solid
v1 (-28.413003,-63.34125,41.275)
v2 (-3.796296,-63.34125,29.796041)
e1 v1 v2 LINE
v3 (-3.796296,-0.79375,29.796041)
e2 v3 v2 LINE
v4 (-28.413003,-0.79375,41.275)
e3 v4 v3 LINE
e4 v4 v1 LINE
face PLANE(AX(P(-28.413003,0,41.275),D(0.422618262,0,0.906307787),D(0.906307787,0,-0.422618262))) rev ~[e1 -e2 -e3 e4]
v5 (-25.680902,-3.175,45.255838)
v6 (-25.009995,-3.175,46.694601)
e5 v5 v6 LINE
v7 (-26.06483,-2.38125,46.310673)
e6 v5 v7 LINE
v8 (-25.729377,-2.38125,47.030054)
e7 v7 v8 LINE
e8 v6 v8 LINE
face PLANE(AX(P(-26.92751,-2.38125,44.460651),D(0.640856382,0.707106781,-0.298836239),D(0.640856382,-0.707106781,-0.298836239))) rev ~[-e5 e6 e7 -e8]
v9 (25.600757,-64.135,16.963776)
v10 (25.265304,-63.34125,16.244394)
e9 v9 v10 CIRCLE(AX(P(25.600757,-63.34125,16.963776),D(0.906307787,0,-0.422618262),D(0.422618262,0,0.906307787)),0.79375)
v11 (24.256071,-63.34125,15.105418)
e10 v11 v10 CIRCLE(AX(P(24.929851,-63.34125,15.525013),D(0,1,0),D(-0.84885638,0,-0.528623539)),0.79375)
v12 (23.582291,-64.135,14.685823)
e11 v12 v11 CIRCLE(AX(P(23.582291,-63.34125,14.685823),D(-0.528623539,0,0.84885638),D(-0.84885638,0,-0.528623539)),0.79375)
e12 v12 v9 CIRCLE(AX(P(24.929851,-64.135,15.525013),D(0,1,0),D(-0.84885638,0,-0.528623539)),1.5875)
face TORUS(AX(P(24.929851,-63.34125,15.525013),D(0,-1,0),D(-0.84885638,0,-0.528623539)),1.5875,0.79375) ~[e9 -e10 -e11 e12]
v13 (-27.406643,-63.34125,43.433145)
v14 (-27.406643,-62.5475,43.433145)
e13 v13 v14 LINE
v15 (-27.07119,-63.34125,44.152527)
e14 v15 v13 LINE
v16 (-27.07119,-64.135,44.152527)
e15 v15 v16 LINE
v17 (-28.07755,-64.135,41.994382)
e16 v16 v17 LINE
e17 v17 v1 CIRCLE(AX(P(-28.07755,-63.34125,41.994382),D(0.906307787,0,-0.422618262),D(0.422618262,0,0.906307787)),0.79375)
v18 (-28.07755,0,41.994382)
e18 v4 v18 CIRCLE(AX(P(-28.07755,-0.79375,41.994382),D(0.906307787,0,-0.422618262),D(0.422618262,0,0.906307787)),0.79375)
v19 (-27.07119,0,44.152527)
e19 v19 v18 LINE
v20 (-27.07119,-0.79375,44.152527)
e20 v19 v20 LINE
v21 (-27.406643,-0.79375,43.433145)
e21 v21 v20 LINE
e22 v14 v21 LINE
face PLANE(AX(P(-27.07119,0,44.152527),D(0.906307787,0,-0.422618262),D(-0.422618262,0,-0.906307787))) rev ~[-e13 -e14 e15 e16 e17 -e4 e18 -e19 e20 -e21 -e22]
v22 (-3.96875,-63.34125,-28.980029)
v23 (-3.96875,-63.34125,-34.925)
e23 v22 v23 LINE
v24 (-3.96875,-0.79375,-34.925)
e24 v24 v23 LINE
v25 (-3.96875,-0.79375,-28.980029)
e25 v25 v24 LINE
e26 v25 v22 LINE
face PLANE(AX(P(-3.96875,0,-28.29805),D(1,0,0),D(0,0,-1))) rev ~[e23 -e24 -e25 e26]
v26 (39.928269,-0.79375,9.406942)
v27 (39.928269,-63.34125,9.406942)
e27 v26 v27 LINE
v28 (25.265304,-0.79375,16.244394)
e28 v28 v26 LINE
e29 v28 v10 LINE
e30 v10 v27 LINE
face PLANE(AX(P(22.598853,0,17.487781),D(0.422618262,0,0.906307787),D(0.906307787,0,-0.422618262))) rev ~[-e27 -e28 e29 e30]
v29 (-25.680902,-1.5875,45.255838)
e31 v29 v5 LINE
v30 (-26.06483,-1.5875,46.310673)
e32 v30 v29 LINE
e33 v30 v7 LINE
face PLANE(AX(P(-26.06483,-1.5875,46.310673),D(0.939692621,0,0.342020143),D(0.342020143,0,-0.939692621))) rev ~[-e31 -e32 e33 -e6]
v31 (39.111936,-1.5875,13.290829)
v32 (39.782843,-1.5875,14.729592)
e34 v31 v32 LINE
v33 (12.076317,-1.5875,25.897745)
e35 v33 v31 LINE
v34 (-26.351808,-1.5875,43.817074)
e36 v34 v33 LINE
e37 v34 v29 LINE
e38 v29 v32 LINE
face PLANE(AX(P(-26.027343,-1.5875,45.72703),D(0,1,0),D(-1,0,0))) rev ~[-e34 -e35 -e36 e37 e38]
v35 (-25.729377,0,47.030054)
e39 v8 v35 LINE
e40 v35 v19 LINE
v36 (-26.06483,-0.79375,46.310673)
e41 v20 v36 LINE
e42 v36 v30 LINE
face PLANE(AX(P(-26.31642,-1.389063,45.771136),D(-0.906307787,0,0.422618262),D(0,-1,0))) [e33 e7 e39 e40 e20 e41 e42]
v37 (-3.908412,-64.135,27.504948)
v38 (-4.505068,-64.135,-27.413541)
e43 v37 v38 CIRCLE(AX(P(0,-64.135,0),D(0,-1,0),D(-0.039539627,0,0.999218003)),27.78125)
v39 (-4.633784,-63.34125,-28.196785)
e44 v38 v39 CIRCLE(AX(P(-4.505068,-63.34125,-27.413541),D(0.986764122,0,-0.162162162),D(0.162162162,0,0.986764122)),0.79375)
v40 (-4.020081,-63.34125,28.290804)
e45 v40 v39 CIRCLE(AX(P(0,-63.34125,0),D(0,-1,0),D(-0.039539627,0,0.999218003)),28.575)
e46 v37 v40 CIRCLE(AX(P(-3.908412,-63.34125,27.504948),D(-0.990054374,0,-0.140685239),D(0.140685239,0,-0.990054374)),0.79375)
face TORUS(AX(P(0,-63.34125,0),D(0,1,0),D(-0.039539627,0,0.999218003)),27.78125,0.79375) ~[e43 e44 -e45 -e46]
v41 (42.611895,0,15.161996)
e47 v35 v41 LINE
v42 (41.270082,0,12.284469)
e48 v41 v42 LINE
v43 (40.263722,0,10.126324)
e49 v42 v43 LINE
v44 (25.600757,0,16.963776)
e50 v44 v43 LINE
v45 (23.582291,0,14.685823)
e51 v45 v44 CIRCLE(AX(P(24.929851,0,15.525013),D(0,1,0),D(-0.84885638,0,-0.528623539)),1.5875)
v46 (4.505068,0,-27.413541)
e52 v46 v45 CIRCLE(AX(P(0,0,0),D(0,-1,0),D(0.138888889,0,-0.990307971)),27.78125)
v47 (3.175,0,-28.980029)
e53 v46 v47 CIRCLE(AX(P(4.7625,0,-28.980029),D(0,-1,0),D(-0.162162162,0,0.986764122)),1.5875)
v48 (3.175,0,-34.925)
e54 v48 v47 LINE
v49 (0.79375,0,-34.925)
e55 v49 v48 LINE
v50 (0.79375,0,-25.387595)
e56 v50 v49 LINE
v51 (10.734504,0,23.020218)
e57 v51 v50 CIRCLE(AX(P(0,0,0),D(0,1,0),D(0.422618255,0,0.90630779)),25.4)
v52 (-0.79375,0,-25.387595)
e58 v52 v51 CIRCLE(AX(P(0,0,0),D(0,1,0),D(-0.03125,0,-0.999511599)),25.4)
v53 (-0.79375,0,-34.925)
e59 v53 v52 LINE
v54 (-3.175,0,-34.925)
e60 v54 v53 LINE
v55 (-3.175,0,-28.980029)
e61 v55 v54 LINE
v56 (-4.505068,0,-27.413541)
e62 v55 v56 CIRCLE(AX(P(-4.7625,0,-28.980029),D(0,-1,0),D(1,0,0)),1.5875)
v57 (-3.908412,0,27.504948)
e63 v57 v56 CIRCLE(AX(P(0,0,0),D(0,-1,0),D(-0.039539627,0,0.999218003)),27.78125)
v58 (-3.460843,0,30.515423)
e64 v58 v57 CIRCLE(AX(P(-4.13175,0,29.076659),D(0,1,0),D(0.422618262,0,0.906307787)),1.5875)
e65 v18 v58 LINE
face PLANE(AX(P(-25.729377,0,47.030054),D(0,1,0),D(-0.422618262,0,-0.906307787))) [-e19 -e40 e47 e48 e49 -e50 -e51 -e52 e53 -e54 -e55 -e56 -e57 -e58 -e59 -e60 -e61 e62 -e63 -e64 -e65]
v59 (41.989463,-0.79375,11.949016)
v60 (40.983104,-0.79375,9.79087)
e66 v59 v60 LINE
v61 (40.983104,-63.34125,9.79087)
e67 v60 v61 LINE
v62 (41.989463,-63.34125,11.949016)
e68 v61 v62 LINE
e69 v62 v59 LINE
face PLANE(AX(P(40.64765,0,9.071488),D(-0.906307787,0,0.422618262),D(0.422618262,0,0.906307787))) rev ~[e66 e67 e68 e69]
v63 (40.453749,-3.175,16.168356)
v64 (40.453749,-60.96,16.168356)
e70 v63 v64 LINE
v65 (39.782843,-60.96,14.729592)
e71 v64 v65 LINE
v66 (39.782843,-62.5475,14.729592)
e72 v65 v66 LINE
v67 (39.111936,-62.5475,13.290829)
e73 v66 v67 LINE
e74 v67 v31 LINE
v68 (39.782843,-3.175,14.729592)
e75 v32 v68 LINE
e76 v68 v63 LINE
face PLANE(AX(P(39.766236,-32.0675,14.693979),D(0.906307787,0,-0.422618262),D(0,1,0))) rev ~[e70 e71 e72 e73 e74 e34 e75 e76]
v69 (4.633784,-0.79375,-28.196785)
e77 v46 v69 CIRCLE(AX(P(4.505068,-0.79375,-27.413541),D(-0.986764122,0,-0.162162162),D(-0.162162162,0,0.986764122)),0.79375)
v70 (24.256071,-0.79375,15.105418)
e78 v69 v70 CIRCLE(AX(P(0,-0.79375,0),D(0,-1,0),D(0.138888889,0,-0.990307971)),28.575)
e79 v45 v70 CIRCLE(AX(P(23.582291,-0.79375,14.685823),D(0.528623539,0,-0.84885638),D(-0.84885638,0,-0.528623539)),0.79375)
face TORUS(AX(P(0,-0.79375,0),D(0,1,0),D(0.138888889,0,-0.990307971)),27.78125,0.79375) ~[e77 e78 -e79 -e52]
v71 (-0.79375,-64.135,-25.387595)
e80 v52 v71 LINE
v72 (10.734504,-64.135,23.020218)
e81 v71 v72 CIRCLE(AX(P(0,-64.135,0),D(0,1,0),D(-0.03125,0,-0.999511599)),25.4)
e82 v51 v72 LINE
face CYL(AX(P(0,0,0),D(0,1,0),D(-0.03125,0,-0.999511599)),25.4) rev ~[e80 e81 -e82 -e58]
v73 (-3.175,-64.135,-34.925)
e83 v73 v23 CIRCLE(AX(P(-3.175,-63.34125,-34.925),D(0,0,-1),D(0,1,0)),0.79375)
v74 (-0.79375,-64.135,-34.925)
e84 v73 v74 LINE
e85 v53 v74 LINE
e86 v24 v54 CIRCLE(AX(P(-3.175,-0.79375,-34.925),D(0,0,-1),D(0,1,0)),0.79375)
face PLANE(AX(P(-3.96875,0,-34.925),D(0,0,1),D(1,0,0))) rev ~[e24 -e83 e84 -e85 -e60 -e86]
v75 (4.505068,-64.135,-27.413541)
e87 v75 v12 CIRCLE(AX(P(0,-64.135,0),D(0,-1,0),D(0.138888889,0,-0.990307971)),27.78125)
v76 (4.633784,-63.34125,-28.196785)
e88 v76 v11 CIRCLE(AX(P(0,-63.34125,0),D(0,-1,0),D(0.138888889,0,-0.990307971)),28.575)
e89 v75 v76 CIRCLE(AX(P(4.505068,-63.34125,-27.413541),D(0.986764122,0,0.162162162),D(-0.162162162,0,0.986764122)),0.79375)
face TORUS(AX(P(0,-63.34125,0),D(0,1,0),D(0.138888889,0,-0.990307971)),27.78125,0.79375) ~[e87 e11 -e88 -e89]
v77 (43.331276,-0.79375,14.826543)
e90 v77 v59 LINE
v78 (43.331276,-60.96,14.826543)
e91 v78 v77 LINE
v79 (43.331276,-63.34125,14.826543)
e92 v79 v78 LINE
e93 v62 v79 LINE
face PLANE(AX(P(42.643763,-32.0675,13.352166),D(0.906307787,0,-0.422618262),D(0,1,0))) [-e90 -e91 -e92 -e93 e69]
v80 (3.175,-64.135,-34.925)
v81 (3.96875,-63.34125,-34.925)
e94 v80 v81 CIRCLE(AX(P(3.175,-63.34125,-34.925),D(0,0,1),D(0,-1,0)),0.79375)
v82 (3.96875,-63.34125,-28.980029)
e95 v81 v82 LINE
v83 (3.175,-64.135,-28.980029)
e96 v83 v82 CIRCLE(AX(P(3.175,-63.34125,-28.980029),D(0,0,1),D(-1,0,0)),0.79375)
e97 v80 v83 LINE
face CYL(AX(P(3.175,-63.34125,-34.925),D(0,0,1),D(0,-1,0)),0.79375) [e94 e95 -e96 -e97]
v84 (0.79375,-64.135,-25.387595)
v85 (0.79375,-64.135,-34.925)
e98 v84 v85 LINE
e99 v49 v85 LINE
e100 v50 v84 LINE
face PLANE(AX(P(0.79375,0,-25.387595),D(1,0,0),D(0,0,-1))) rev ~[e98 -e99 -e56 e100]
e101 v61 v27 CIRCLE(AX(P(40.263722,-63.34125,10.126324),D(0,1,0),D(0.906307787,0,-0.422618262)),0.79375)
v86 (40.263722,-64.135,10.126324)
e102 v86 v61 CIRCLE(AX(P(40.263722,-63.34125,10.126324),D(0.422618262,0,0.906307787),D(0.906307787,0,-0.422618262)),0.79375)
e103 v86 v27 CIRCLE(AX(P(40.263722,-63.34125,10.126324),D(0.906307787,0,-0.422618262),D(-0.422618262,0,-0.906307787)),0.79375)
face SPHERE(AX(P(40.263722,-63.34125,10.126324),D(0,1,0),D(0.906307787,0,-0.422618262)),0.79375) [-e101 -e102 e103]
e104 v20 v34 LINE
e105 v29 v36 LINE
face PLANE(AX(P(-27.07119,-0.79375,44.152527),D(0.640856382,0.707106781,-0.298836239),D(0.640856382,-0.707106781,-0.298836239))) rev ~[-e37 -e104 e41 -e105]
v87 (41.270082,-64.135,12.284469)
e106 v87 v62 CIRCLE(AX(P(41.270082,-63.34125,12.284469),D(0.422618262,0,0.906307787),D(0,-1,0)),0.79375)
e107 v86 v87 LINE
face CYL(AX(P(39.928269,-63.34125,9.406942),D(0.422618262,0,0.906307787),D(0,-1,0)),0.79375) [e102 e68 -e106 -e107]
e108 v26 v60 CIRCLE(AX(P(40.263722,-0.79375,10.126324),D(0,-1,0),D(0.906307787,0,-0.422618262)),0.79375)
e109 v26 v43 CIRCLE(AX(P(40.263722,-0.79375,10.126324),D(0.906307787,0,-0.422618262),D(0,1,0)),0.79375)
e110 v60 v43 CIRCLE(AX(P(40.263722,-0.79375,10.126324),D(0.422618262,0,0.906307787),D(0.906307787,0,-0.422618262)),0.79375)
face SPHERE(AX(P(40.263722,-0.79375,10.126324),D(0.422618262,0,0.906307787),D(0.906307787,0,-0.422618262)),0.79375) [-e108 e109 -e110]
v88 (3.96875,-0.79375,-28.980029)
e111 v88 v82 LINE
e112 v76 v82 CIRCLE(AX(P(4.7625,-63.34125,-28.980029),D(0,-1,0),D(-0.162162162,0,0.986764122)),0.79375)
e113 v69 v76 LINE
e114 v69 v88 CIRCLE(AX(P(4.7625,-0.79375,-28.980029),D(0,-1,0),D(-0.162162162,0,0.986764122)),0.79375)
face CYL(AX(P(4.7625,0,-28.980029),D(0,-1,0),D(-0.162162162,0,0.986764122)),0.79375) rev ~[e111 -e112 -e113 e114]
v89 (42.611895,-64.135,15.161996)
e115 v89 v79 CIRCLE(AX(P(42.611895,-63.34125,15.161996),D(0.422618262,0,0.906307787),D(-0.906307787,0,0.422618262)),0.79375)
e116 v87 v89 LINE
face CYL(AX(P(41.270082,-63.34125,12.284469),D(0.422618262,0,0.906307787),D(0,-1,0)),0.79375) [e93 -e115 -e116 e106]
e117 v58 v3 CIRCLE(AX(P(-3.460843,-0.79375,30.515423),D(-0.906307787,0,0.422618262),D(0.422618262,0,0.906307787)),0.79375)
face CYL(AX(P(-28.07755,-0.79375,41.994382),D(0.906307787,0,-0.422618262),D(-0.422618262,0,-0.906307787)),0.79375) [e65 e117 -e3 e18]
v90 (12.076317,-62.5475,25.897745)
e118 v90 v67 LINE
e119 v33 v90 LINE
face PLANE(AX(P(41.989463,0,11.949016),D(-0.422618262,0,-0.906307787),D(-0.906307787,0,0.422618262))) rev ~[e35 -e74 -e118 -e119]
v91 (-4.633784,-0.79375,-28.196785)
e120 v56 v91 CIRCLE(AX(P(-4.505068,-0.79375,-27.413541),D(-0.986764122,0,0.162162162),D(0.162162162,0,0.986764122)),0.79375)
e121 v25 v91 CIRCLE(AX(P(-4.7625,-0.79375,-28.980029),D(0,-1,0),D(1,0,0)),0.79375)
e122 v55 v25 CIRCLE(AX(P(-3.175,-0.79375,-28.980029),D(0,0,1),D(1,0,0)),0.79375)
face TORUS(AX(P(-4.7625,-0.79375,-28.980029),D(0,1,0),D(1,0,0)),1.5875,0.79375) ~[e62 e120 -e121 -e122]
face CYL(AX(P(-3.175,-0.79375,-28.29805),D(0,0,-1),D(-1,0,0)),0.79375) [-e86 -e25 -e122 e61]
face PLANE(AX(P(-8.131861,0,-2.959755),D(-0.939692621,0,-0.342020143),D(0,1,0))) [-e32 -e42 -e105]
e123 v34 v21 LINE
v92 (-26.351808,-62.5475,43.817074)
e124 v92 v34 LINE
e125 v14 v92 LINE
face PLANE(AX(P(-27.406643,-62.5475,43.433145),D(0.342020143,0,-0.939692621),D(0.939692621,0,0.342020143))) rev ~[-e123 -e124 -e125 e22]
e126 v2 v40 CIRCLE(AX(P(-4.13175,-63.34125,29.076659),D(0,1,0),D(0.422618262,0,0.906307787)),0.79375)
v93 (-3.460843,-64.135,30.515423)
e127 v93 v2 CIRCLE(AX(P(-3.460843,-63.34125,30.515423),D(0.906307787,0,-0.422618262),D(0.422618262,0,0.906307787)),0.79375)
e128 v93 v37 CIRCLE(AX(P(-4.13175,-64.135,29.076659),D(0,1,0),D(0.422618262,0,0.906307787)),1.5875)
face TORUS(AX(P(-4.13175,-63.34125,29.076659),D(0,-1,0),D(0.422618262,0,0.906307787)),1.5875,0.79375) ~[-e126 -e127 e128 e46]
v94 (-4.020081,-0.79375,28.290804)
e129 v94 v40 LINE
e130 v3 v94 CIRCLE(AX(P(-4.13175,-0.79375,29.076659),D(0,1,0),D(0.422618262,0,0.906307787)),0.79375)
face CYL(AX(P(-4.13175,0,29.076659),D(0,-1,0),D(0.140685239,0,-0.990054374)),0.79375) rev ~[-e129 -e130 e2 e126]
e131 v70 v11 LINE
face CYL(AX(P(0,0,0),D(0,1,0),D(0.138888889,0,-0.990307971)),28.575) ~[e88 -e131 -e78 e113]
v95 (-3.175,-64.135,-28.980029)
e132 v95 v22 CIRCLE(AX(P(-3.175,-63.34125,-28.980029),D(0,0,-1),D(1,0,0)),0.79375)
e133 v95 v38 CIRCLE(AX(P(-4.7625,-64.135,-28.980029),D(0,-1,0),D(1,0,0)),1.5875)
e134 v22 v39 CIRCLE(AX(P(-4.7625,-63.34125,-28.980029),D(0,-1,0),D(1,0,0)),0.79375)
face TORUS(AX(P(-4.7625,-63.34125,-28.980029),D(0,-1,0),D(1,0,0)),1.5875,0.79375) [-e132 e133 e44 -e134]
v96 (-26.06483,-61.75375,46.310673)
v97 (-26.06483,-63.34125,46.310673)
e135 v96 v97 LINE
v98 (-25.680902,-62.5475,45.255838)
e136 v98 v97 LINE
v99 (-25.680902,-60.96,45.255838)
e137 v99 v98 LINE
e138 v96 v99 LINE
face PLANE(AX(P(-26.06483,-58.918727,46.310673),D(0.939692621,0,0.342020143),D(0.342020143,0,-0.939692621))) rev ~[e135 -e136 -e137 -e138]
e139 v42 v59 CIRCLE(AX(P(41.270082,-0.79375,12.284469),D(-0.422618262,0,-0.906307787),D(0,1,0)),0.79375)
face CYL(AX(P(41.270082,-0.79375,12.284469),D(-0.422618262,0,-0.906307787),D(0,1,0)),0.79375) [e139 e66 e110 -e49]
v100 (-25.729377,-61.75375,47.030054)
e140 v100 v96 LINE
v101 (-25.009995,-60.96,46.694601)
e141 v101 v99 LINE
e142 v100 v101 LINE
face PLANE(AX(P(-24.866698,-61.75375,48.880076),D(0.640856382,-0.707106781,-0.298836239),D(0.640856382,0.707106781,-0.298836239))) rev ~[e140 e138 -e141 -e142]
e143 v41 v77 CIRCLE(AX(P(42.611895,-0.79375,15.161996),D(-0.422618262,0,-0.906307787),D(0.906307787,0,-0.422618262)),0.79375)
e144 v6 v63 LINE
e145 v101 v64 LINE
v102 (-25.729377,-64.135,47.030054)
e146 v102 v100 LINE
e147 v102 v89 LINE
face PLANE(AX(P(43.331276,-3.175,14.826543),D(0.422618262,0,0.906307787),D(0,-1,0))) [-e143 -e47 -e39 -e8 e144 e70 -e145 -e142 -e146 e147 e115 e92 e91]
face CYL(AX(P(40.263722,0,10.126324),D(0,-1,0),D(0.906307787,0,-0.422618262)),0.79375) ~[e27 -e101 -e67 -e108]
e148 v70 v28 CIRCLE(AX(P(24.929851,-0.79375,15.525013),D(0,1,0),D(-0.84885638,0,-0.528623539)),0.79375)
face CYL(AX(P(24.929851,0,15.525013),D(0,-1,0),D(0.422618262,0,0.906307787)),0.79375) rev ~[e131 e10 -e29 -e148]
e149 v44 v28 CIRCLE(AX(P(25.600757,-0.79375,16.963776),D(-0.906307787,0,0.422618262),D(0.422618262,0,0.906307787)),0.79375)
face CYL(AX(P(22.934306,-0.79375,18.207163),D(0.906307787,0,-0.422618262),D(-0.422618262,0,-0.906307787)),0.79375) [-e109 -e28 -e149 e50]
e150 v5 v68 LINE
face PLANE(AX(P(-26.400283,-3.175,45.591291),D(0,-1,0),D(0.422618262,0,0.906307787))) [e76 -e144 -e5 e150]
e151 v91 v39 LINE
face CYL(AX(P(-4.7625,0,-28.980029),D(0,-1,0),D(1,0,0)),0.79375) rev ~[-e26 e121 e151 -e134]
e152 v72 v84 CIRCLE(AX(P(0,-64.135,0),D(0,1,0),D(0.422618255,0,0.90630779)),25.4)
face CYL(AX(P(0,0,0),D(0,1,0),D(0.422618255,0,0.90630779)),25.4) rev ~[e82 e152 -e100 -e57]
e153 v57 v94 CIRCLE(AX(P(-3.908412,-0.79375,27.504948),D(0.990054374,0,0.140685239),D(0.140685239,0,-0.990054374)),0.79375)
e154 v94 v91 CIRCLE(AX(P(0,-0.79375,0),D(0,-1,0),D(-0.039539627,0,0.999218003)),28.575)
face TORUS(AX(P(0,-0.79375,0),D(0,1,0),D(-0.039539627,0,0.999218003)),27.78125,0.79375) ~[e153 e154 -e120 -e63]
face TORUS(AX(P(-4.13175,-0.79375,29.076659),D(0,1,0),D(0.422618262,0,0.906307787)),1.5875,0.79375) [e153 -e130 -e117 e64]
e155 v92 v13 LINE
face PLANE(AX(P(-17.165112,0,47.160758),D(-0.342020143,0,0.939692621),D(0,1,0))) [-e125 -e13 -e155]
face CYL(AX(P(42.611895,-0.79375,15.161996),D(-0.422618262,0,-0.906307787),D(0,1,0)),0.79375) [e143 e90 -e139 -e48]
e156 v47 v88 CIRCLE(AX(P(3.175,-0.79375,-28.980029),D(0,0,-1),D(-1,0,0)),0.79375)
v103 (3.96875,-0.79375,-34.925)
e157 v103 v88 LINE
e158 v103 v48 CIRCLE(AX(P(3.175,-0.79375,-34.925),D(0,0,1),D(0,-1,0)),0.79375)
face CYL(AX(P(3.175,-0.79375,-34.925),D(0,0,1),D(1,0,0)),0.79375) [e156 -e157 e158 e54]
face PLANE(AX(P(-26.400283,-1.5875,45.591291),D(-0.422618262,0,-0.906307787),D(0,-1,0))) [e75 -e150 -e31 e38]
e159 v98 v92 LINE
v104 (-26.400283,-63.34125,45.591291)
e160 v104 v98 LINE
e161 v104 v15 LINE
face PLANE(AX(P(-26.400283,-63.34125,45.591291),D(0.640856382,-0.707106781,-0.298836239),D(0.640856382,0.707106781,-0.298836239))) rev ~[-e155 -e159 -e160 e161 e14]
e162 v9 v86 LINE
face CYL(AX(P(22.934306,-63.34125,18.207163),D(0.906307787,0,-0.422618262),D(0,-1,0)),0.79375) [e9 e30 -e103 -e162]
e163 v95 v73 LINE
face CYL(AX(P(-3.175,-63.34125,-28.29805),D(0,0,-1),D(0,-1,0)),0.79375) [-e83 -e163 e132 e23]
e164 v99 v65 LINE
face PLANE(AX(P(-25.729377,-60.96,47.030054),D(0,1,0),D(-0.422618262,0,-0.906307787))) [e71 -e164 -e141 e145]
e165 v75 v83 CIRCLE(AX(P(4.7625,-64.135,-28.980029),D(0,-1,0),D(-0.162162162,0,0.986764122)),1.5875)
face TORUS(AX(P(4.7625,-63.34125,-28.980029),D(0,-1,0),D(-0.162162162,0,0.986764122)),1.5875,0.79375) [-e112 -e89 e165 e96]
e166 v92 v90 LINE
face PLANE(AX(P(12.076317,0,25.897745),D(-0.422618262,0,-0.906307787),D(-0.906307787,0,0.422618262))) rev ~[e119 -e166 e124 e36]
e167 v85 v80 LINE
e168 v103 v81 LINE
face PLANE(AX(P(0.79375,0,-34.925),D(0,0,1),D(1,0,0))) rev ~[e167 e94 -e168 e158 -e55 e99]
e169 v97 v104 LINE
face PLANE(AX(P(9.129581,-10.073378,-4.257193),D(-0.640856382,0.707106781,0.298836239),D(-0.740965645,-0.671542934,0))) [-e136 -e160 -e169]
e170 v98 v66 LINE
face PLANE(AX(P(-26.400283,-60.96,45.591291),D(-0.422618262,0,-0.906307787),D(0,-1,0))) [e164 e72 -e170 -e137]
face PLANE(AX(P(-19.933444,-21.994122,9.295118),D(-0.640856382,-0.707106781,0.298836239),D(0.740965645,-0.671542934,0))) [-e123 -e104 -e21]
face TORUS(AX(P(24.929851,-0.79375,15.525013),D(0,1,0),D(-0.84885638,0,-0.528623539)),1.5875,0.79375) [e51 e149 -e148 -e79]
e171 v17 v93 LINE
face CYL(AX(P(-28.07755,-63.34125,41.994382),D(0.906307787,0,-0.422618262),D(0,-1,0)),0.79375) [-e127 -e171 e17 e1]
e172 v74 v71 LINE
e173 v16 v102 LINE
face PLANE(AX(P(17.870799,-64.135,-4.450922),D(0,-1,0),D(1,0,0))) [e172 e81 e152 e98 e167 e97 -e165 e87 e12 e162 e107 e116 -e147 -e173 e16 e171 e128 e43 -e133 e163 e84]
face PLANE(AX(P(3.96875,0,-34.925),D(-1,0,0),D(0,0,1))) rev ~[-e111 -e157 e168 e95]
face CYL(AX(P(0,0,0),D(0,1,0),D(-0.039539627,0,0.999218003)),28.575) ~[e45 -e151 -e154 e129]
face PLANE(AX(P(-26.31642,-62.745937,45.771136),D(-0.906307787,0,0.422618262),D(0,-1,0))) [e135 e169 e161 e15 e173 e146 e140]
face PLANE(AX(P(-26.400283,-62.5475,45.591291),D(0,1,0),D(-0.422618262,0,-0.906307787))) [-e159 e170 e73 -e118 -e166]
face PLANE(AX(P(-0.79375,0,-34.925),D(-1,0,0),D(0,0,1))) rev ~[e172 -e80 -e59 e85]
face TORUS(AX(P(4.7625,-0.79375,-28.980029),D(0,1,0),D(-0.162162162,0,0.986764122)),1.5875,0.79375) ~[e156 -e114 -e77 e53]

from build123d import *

# Parameters (mm, degrees)
F1_DEPTH     = 64.135
F3_DEPTH     = 76.2
F5_DEPTH     = 3.175
F6_R         = 0.79375
F7_T1_DEPTH  = 3.6287733717
F7_T6_DEPTH  = 4.4225233717
F7_T8_DEPTH  = 4.8762967434
F7_T13_DEPTH = 63.7950233717
F7_T18_DEPTH = 4.4225233717
F7_T23_DEPTH = 6.4637967434
F7_T25_DEPTH = 4.8762967434


# Not quite as in the source:
# - a fillet or chamfer that OpenCascade refuses, or shapes differently, is made with other operations: its cross-section is extruded or revolved along the edge and cut away or added


with BuildPart() as f1:
    # F0 (on Front) → F1 (new body)
    with BuildSketch(Plane.XZ):
        with BuildLine():
            ThreePointArc((10.7345036748, 23.0202178716), (24.8808005482, -5.1093800095), (0.79375, -25.3875946269))
            Line((0.79375, -25.3875946269), (0.79375, -28.563973567))
            ThreePointArc((0.79375, -28.563973567), (2.3849591955, -28.4752979727), (3.96875, -28.2980502586))
            ThreePointArc((3.96875, -28.2980502586), (26.4678099831, -10.7696638619), (22.5988525327, 17.4877811401))
            Line((22.5988525327, 17.4877811401), (10.7345036748, 23.0202178716))
        make_face()
        with BuildLine():
            Line((-1.1298448363, 28.5526544413), (10.7345036748, 23.0202178716))
            Line((10.7345036748, 23.0202178716), (22.5988525327, 17.4877811401))
            ThreePointArc((22.5988525327, 17.4877811401), (17.8402275241, 22.3216689987), (12.0763169886, 25.8977449403))
            ThreePointArc((12.0763169886, 25.8977449403), (5.6319134635, 28.0144993841), (-1.1298448363, 28.5526544413))
        make_face()
        with BuildLine():
            ThreePointArc((-0.79375, -25.3875946269), (-24.708980627, 5.8844096028), (10.7345036748, 23.0202178716))
            Line((10.7345036748, 23.0202178716), (-1.1298448363, 28.5526544413))
            ThreePointArc((-1.1298448363, 28.5526544413), (-28.5394389143, 1.4251496253), (-3.96875, -28.2980502586))
            ThreePointArc((-3.96875, -28.2980502586), (-2.3849591955, -28.4752979727), (-0.79375, -28.563973567))
            Line((-0.79375, -28.563973567), (-0.79375, -25.3875946269))
        make_face()
        with BuildLine():
            ThreePointArc((3.96875, -28.2980502586), (2.3849591955, -28.4752979727), (0.79375, -28.563973567))
            Line((0.79375, -28.563973567), (0.79375, -34.925))
            Line((0.79375, -34.925), (3.96875, -34.925))
            Line((3.96875, -34.925), (3.96875, -28.2980502586))
        make_face()
        with BuildLine():
            ThreePointArc((12.0763169886, 25.8977449403), (17.8402275241, 22.3216689987), (22.5988525327, 17.4877811401))
            Line((22.5988525327, 17.4877811401), (40.6476504402, 9.0714884554))
            Line((40.6476504402, 9.0714884554), (41.9894634213, 11.9490156792))
            Line((41.9894634213, 11.9490156792), (12.0763169886, 25.8977449403))
        make_face()
        with BuildLine():
            Line((-28.413002932, 41.275), (-1.1298448363, 28.5526544413))
            ThreePointArc((-1.1298448363, 28.5526544413), (5.6319134635, 28.0144993841), (12.0763169886, 25.8977449403))
            Line((12.0763169886, 25.8977449403), (-27.0711899509, 44.1525272238))
            Line((-27.0711899509, 44.1525272238), (-28.413002932, 41.275))
        make_face()
        with BuildLine():
            Line((-0.79375, -34.925), (-0.79375, -28.563973567))
            ThreePointArc((-0.79375, -28.563973567), (-2.3849591955, -28.4752979727), (-3.96875, -28.2980502586))
            Line((-3.96875, -28.2980502586), (-3.96875, -34.925))
            Line((-3.96875, -34.925), (-0.79375, -34.925))
        make_face()
    extrude(amount=F1_DEPTH)

    # F2 (on face) → F3 (join, through all)
    with BuildSketch(Plane(origin=(-39.1475067802, 0, 18.2547822093), x_dir=(0, -1, 0), z_dir=(-0.906307787, 0, 0.4226182617))):
        Polygon((0, 31.75), (0, 28.575), (1.5875, 28.575), (1.5875, 30.1625), (3.175, 30.1625), (3.175, 31.75), align=None)
        Polygon((62.5475, 30.1625), (62.5475, 28.575), (64.135, 28.575), (64.135, 31.75), (60.96, 31.75), (60.96, 30.1625), align=None)
    extrude(amount=-F3_DEPTH)

    # F4 (on face) → F5 (join)
    with BuildSketch(Plane(origin=(29.913146592, 0, -13.9487293354), x_dir=(0, 1, 0), z_dir=(0.906307787, 0, -0.4226182617))):
        Polygon((-3.175, 31.75), (-60.96, 31.75), (-60.96, 30.1625), (-62.5475, 30.1625), (-62.5475, 28.575), (-1.5875, 28.575), (-1.5875, 30.1625), (-3.175, 30.1625), align=None)
    extrude(amount=-F5_DEPTH)

    # F6
    f6_edges = [f1.edges().sort_by_distance(p)[0] for p in [
        (-28.539439, 0, 1.42515),
        (-28.539439, -64.135, 1.42515),
        (-1.129845, -32.0675, 28.552654),
        (-3.96875, -32.0675, -28.29805),
        (22.598853, -32.0675, 17.487781),
        (3.96875, -32.0675, -28.29805),
        (26.46781, 0, -10.769664),
        (26.46781, -64.135, -10.769664),
        (41.989463, 0, 11.949016),
        (40.64765, -32.0675, 9.071488),
        (41.989463, -64.135, 11.949016),
        (3.96875, -64.135, -31.611525),
        (31.623251, -64.135, 13.279635),
        (-14.771424, -64.135, 34.913827),
        (-3.96875, -64.135, -31.611525),
        (-3.96875, 0, -31.611525),
        (-14.771424, 0, 34.913827),
        (31.623251, 0, 13.279635),
        (3.96875, 0, -31.611525),
    ]]
    fillet(f6_edges, radius=F6_R)

    # F7: chamfer of 0.79375 on 7 edges, made by hand

    # F7_s2 → F7_t1 (cut)
    with BuildSketch(Plane.XZ.offset(1.5875)):
        Polygon((-26.0648302152, 46.3106726417), (-25.6809016545, 45.2558375905), (-26.4002834604, 45.5912908358), align=None)
    extrude(amount=F7_T1_DEPTH, mode=Mode.SUBTRACT)


with BuildPart() as f7_tool4:
    # F7_s5 → F7_t6 (new body)
    with BuildSketch(Plane(origin=(12.0763168292, 0, 25.8977450146), x_dir=(0, 1, 0), z_dir=(0.4226182617, 0, 0.906307787))):
        Polygon((-0.79375, 43.1944945637), (-1.5875, 42.4007445637), (-1.5875, 43.1944945637), align=None)
    extrude(amount=F7_T6_DEPTH)

    split(bisect_by=Plane(origin=(-8.131860996, 0, -2.9597553517), x_dir=(0, 1, 0), z_dir=(-0.9396926208, 0, -0.3420201433)), keep=Keep.TOP)


with BuildPart() as f1_1:
    add(f1.part)

    # F7_t3: cut F7_tool4
    add(f7_tool4.part, mode=Mode.SUBTRACT)

    # F7_s9 → F7_t8 (cut)
    with BuildSketch(Plane(origin=(12.2199971609, 0, 26.2058684802), x_dir=(0, 1, 0), z_dir=(0.4226182617, 0, 0.906307787))):
        Polygon((-2.38125, 43.1944945637), (-3.175, 42.4007445637), (-3.175, 43.1944945637), align=None)
    extrude(amount=F7_T8_DEPTH, mode=Mode.SUBTRACT)


with BuildPart() as f7_tool11:
    # F7_s12 → F7_t13 (new body)
    with BuildSketch(Plane.XZ.offset(62.5475)):
        Polygon((-27.4066431962, 43.4331454179), (-26.351808145, 43.8170739786), (-27.0711899509, 44.1525272238), align=None)
    extrude(amount=-F7_T13_DEPTH)

    split(bisect_by=Plane(origin=(-19.9334442931, -21.9941222818, 9.2951177273), x_dir=(0.7409656453, -0.6715429342, 0), z_dir=(-0.6408563821, -0.7071067812, 0.2988362387)), keep=Keep.TOP)


with BuildPart() as f1_2:
    add(f1_1.part)

    # F7_t10: cut F7_tool11
    add(f7_tool11.part, mode=Mode.SUBTRACT)


with BuildPart() as f7_tool16:
    # F7_s17 → F7_t18 (new body)
    with BuildSketch(Plane(origin=(12.7472233198, 0, 27.3365086265), x_dir=(0, 1, 0), z_dir=(-0.4226182617, 0, -0.906307787))):
        Polygon((-63.34125, -43.1944945637), (-62.5475, -42.4007445637), (-62.5475, -43.1944945637), align=None)
    extrude(amount=F7_T18_DEPTH)

    split(bisect_by=Plane(origin=(-17.1651120978, 0, 47.160757891), x_dir=(0, 1, 0), z_dir=(-0.3420201433, 0, 0.9396926208)), keep=Keep.TOP)


with BuildPart() as f1_3:
    add(f1_2.part)

    # F7_t15: cut F7_tool16
    add(f7_tool16.part, mode=Mode.SUBTRACT)


with BuildPart() as f7_tool21:
    # F7_s22 → F7_t23 (new body)
    with BuildSketch(Plane.XZ.offset(58.9187266283)):
        Polygon((-26.0648302152, 46.3106726417), (-25.6809016545, 45.2558375905), (-26.4002834604, 45.5912908358), align=None)
    extrude(amount=F7_T23_DEPTH)

    split(bisect_by=Plane(origin=(9.1295806677, -10.0733777182, -4.2571933811), x_dir=(-0.7409656453, -0.6715429342, 0), z_dir=(-0.6408563821, 0.7071067812, 0.2988362387)), keep=Keep.TOP)


with BuildPart() as f1_4:
    add(f1_3.part)

    # F7_t20: cut F7_tool21
    add(f7_tool21.part, mode=Mode.SUBTRACT)

    # F7_s26 → F7_t25 (cut)
    with BuildSketch(Plane(origin=(14.2808092144, 0, 30.6252941907), x_dir=(0, 1, 0), z_dir=(-0.4226182617, 0, -0.906307787))):
        Polygon((-61.75375, -43.1944945637), (-60.96, -42.4007445637), (-60.96, -43.1944945637), align=None)
    extrude(amount=F7_T25_DEPTH, mode=Mode.SUBTRACT)


solid = f1_4.part
